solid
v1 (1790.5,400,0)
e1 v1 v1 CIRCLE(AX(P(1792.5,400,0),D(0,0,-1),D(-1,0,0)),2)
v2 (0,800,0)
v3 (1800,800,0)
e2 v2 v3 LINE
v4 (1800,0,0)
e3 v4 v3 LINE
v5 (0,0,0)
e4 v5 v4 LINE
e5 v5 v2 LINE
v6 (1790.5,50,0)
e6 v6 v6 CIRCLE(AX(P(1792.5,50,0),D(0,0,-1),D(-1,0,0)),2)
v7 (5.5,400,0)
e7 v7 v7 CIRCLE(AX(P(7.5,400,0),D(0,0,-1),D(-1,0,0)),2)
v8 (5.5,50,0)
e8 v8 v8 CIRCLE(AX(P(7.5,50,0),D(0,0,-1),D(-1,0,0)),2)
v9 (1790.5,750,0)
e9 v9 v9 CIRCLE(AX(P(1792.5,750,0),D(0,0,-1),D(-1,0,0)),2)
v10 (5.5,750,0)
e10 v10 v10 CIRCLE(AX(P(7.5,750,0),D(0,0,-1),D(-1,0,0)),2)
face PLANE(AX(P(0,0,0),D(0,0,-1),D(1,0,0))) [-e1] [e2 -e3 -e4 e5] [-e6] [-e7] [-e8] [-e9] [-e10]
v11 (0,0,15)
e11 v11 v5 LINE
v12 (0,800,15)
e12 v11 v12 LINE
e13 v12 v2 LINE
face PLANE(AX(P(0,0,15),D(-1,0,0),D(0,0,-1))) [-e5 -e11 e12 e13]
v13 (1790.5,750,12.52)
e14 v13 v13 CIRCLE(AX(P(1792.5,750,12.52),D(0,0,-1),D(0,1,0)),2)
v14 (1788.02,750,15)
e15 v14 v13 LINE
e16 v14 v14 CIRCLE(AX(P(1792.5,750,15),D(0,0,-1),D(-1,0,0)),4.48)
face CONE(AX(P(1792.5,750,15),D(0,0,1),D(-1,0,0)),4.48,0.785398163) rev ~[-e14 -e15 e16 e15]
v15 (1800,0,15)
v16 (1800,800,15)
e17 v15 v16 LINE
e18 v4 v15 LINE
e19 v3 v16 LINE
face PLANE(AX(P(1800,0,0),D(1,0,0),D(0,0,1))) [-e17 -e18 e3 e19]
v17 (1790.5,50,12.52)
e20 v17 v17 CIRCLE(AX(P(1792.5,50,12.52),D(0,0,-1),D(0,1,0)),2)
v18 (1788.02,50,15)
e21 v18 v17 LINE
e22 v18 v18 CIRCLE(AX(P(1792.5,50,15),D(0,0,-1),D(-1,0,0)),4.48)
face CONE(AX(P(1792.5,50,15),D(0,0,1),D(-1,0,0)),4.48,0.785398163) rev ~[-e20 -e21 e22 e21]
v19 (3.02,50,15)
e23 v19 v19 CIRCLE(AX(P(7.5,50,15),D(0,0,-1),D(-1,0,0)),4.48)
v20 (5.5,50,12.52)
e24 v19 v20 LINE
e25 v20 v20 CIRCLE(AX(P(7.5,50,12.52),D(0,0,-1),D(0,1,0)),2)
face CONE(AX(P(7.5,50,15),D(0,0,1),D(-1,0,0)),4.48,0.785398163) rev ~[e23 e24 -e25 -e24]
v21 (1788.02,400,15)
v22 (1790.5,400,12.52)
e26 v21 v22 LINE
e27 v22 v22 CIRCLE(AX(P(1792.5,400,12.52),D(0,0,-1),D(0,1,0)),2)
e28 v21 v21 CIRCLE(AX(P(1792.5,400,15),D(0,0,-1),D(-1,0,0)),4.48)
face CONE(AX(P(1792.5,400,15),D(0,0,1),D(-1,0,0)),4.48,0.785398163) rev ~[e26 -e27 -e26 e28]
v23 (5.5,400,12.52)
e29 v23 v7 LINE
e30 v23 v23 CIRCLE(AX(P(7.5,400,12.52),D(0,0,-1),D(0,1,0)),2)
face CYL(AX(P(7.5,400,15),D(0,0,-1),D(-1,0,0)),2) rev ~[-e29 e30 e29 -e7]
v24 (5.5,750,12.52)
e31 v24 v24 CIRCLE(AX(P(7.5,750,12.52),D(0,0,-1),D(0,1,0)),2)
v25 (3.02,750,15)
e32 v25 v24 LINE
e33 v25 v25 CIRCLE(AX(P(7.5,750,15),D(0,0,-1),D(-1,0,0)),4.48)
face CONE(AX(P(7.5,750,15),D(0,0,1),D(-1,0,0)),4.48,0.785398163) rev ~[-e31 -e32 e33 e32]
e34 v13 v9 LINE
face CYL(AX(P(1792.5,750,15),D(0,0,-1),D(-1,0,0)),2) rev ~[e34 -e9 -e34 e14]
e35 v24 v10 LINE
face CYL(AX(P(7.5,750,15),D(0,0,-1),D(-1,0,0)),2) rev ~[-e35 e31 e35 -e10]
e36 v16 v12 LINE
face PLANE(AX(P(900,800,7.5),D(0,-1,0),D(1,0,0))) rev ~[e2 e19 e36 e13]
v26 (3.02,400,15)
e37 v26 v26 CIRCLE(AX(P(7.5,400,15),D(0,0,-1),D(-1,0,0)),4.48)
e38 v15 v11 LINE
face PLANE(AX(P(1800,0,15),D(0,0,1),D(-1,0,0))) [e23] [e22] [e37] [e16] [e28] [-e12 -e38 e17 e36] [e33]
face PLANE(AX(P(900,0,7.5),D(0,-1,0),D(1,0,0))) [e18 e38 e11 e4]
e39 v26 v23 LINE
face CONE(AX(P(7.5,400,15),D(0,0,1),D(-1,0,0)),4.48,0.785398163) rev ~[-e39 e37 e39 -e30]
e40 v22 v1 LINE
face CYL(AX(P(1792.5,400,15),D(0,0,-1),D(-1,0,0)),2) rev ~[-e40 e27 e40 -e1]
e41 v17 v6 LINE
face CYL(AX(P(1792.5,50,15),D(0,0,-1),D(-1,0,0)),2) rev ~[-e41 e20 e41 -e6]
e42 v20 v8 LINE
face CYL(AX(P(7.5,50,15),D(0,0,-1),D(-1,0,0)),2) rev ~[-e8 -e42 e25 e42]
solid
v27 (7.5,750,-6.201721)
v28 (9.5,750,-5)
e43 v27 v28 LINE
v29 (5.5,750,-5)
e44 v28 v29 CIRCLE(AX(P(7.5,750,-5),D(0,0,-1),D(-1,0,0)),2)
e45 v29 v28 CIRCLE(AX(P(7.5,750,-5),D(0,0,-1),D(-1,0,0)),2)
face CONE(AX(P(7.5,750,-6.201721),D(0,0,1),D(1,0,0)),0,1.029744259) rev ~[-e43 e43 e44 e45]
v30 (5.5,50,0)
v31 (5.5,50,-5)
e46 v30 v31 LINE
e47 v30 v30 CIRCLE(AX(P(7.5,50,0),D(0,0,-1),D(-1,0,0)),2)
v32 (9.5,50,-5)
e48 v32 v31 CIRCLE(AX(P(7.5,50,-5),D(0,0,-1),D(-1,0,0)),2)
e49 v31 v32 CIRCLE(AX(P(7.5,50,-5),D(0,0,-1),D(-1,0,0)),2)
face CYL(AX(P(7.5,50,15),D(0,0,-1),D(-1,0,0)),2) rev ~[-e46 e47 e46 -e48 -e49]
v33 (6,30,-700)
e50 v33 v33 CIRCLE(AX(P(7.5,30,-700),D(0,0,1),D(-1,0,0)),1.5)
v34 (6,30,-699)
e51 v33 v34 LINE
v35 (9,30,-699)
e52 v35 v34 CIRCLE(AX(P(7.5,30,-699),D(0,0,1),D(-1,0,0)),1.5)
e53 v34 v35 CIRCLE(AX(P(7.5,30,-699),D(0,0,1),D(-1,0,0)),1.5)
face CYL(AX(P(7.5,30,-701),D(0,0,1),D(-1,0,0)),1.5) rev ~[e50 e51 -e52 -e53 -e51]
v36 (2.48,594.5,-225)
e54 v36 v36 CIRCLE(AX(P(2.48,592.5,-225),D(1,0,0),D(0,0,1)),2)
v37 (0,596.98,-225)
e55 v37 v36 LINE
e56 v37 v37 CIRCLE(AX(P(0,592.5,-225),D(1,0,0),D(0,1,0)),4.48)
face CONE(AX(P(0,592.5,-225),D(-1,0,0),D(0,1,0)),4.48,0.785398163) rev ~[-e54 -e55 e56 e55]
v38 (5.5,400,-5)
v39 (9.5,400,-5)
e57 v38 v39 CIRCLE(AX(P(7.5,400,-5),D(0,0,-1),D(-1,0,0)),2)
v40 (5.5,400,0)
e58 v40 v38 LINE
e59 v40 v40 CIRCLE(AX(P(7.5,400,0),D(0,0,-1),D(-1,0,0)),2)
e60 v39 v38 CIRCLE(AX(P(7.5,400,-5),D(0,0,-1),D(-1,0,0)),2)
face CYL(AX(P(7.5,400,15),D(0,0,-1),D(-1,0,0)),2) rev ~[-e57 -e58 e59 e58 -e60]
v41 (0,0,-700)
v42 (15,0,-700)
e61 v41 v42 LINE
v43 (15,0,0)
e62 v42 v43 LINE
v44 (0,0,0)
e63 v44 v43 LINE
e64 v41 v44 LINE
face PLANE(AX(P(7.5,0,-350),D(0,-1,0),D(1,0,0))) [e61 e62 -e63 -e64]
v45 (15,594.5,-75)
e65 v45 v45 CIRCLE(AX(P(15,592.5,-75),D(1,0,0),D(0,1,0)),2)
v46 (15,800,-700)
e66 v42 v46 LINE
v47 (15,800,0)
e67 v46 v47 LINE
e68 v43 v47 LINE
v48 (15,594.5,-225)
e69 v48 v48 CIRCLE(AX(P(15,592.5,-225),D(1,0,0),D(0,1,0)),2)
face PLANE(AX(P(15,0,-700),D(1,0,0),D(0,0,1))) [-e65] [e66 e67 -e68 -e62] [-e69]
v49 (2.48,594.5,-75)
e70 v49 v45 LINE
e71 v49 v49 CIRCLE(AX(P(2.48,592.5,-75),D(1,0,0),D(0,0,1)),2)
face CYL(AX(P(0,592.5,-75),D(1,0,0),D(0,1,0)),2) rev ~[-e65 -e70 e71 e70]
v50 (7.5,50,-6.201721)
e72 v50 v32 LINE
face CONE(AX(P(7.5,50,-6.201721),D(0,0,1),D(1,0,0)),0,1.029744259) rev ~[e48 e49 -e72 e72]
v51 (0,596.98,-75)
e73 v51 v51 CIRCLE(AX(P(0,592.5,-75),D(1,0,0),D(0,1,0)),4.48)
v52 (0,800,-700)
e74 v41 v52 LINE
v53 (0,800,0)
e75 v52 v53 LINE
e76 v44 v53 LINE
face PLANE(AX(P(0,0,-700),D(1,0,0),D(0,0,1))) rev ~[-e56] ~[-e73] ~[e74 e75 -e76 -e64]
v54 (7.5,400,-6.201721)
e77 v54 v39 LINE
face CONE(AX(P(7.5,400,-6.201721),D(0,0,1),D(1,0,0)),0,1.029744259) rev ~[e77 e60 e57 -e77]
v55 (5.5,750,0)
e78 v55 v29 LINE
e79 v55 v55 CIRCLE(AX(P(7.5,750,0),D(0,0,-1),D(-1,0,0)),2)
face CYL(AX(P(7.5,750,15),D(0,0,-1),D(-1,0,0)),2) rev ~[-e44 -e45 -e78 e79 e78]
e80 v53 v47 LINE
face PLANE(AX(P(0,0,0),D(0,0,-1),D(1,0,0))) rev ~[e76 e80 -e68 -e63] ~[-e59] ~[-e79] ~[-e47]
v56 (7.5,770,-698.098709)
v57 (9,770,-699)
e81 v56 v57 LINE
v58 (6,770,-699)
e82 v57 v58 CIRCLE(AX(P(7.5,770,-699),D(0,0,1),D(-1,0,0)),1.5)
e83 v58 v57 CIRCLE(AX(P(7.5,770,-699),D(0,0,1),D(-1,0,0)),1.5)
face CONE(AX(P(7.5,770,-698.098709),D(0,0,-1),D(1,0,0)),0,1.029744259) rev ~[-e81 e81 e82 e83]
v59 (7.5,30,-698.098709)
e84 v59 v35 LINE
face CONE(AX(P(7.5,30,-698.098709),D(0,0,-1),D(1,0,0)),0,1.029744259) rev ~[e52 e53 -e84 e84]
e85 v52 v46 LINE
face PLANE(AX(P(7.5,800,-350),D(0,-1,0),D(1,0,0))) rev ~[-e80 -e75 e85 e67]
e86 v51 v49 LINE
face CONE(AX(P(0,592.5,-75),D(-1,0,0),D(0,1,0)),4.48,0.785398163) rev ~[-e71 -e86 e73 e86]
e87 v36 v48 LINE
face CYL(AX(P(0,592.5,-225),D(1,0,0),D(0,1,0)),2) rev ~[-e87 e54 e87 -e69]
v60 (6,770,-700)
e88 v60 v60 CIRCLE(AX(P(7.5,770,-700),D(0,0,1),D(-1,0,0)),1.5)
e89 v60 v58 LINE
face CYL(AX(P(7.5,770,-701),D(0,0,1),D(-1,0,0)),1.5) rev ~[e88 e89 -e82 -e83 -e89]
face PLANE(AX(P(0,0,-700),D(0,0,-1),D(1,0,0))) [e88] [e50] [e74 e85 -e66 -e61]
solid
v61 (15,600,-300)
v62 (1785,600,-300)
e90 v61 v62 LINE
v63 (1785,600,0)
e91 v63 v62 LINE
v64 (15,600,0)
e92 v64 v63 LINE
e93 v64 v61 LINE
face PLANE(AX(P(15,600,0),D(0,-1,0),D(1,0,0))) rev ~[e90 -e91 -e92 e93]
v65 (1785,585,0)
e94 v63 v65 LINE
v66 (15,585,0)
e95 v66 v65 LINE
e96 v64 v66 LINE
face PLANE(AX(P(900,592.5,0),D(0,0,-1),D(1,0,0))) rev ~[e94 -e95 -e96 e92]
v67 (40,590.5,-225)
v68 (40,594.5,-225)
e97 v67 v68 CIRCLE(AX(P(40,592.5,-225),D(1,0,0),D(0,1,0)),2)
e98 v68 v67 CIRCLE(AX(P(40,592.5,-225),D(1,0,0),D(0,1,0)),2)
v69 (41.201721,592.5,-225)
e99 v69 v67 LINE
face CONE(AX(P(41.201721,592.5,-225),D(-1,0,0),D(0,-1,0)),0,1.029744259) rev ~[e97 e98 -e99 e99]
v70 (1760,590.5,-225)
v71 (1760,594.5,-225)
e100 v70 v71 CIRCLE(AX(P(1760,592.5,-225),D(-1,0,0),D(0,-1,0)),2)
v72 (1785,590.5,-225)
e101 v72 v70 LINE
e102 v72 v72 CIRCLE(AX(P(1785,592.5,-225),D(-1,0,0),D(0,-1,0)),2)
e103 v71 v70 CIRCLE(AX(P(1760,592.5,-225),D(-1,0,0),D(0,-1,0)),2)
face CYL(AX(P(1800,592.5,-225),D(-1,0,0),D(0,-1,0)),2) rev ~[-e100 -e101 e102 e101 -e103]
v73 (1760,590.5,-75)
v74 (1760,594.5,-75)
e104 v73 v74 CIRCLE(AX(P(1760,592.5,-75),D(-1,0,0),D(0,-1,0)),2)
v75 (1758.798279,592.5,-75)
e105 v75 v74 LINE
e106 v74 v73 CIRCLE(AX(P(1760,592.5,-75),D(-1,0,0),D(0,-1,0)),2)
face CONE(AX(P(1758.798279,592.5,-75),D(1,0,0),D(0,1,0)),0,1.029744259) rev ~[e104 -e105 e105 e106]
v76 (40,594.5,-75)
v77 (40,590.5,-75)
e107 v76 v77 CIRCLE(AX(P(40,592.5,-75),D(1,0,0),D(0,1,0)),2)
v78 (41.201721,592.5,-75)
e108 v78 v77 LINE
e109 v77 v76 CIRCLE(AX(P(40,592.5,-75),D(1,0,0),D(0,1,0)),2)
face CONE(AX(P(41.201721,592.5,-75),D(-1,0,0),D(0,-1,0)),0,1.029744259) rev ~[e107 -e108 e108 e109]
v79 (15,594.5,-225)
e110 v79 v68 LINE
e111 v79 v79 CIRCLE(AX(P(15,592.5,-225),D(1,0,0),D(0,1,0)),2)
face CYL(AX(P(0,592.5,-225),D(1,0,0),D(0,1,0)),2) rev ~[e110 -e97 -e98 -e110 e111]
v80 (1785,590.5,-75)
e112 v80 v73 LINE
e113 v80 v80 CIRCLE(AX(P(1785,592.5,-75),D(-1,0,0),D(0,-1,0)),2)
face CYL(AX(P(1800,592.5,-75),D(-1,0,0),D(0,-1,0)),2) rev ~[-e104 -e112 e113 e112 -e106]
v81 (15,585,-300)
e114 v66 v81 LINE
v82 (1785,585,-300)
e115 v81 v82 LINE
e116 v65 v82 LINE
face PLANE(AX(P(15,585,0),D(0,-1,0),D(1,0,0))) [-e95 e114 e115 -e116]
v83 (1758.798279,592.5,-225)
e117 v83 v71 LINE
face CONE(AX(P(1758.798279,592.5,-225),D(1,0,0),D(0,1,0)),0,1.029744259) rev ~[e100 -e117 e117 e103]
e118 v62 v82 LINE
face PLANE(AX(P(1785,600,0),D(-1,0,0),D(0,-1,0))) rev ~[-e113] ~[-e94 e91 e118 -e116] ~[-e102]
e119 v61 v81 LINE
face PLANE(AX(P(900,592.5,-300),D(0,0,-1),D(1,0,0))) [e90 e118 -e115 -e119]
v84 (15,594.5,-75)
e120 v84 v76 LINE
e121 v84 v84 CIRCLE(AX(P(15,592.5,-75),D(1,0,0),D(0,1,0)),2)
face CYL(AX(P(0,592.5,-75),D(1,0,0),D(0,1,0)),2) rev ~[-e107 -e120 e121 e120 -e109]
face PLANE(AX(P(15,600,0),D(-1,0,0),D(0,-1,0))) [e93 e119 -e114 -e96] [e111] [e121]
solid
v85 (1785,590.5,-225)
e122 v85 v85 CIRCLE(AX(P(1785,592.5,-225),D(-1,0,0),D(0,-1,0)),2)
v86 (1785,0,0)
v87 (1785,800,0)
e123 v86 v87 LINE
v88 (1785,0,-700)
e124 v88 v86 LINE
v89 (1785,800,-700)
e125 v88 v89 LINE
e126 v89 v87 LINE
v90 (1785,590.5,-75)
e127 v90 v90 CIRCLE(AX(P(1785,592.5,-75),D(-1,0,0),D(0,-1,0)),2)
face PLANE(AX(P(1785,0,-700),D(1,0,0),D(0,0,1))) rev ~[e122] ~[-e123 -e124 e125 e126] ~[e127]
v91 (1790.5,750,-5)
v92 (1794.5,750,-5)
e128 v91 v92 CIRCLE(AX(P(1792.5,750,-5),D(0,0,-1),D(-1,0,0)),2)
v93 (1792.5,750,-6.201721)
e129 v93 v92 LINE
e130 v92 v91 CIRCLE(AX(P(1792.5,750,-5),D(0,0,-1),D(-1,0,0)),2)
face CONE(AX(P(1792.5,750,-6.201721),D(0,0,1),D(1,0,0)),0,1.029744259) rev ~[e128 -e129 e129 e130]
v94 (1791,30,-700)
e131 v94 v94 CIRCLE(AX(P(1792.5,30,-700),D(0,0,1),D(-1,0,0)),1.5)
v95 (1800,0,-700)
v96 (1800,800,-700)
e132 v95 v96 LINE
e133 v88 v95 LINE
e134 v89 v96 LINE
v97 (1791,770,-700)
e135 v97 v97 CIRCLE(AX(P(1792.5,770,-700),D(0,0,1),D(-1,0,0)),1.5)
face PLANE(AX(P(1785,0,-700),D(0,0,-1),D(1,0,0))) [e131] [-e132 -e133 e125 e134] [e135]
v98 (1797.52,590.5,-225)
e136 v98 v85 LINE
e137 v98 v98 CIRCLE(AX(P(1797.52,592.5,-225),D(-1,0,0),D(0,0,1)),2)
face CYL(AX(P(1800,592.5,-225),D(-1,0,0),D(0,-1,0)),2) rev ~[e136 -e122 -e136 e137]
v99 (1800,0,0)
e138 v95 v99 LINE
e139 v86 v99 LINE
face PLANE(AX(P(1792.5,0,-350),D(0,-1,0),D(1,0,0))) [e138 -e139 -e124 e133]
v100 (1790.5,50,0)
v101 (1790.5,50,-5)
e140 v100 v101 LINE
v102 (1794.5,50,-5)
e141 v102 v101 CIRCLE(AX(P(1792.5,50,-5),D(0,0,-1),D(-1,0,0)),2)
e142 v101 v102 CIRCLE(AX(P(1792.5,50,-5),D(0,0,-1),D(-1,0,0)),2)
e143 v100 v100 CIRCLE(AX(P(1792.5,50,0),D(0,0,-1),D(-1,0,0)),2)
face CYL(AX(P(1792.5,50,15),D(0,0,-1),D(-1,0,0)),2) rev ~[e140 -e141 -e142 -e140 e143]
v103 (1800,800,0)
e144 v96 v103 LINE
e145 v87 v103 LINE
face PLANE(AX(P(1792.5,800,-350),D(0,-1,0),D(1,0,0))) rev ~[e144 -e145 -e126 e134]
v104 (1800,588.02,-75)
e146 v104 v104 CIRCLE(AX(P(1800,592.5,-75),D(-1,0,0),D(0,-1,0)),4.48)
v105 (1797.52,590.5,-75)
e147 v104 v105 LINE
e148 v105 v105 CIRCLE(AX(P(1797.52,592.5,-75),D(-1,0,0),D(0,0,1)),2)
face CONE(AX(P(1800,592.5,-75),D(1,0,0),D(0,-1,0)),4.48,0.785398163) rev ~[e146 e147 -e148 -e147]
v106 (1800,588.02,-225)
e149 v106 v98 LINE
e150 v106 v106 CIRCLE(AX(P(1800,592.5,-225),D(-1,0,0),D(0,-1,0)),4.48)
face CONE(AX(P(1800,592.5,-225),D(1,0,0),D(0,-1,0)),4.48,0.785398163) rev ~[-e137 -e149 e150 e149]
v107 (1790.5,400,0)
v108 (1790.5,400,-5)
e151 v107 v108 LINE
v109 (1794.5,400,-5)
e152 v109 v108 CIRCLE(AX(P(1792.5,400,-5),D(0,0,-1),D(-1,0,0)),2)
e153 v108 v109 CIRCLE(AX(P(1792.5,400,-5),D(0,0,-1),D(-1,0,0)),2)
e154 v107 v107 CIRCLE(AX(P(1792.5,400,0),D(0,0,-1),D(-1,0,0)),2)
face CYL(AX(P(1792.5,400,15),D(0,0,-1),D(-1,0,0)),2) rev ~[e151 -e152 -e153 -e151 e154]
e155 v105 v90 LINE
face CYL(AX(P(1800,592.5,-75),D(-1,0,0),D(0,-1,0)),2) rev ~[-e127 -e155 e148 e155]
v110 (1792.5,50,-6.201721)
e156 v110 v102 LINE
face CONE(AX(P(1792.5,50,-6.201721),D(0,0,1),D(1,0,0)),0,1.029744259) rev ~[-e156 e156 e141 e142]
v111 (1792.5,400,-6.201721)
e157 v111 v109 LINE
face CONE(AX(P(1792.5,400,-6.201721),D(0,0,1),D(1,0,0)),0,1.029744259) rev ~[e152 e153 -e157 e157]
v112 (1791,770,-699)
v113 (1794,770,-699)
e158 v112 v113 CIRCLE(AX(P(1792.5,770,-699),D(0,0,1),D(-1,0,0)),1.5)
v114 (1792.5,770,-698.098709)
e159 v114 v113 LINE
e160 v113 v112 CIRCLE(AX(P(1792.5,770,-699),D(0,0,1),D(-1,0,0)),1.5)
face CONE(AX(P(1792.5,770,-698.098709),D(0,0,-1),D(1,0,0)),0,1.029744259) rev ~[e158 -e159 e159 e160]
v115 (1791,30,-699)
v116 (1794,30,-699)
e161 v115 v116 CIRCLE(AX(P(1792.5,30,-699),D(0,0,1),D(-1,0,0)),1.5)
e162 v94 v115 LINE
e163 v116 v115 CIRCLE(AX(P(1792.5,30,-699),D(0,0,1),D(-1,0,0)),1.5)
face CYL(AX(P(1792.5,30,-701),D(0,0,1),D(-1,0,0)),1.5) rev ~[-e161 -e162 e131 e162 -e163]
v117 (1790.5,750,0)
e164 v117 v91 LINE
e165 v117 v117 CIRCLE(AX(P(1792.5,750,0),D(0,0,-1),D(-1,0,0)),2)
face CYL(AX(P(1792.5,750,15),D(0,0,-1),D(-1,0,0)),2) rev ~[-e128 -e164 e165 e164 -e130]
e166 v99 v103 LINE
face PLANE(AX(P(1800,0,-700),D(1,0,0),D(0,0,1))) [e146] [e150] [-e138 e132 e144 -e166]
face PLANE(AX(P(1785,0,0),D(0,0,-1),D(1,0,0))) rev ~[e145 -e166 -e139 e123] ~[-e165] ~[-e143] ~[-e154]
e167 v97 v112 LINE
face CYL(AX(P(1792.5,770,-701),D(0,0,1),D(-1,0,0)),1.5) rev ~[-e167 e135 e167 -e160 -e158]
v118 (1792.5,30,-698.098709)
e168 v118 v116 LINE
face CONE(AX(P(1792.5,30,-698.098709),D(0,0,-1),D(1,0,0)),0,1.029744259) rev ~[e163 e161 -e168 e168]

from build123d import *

# Parameters (mm, degrees)
F1_DEPTH          = 800
F0_W              = 15
F0_H              = 700
F2_DEPTH          = 800
F3_W              = 1770
F3_H              = 15
F4_DEPTH          = 300
F6_D              = 4
F6_DEPTH          = 20
F6_CSINK_D        = 8.96
F6_CSINK_ANGLE    = 90
F6_TIP            = 1.2017212381
F6_2_D            = 4
F6_2_DEPTH        = 20
F6_2_CSINK_D      = 8.96
F6_2_CSINK_ANGLE  = 90
F6_2_TIP          = 1.2017212381
F6_3_D            = 4
F6_3_DEPTH        = 20
F6_3_CSINK_D      = 8.96
F6_3_CSINK_ANGLE  = 90
F6_3_TIP          = 1.2017212381
F8_D              = 4
F8_DEPTH          = 40
F8_CSINK_D        = 8.96
F8_CSINK_ANGLE    = 90
F8_TIP            = 1.2017212381
F8_2_D            = 4
F8_2_DEPTH        = 40
F8_2_CSINK_D      = 8.96
F8_2_CSINK_ANGLE  = 90
F8_2_TIP          = 1.2017212381
F10_D             = 4
F10_DEPTH         = 40
F10_CSINK_D       = 8.96
F10_CSINK_ANGLE   = 90
F10_TIP           = 1.2017212381
F10_2_D           = 4
F10_2_DEPTH       = 40
F10_2_CSINK_D     = 8.96
F10_2_CSINK_ANGLE = 90
F10_2_TIP         = 1.2017212381
F12_D             = 3
F12_DEPTH         = 1
F12_TIP           = 0.9012909285
F12_2_D           = 3
F12_2_DEPTH       = 1
F12_2_TIP         = 0.9012909285


# Not quite as in the source:
# - a feature names something its author has since deleted; it is built from what else it names


with BuildPart() as f1:
    # F0 (on Front) → F1 (new body)
    with BuildSketch(Plane.XZ):
        Polygon((0, 15), (0, 0), (15, 0), (1785, 0), (1800, 0), (1800, 15), align=None)
    extrude(amount=-F1_DEPTH)

    # F6
    with Locations(Plane.XY.offset(15)):
        with Locations((7.5, 750), (7.5, 400), (7.5, 50), (1792.5, 750), (1792.5, 400), (1792.5, 50)):
            CounterSinkHole(F6_D / 2, F6_CSINK_D / 2, depth=F6_DEPTH, counter_sink_angle=F6_CSINK_ANGLE)
            with Locations((0, 0, -(F6_DEPTH + F6_TIP / 2))):  # 118° drill point
                Cone(0, F6_D / 2, F6_TIP, mode=Mode.SUBTRACT)


with BuildPart() as f2:
    # F0 (on Front) → F2 (new body)
    with BuildSketch(Plane.XZ):
        with Locations((7.5, -350)):
            Rectangle(F0_W, F0_H)
    extrude(amount=-F2_DEPTH)

    # F6#2
    with Locations(Plane.XY.offset(15)):
        with Locations((7.5, 750), (7.5, 400), (7.5, 50), (1792.5, 750), (1792.5, 400), (1792.5, 50)):
            CounterSinkHole(F6_2_D / 2, F6_2_CSINK_D / 2, depth=F6_2_DEPTH, counter_sink_angle=F6_2_CSINK_ANGLE)
            with Locations((0, 0, -(F6_2_DEPTH + F6_2_TIP / 2))):  # 118° drill point
                Cone(0, F6_2_D / 2, F6_2_TIP, mode=Mode.SUBTRACT)

    # F8
    with Locations(Plane(origin=(0, 0, 0), x_dir=(0, -1, 0), z_dir=(-1, 0, 0))):
        with Locations((-592.5, -75), (-592.5, -225)):
            CounterSinkHole(F8_D / 2, F8_CSINK_D / 2, depth=F8_DEPTH, counter_sink_angle=F8_CSINK_ANGLE)
            with Locations((0, 0, -(F8_DEPTH + F8_TIP / 2))):  # 118° drill point
                Cone(0, F8_D / 2, F8_TIP, mode=Mode.SUBTRACT)

    # F12
    with Locations(Plane(origin=(0, 0, -700), x_dir=(1, 0, 0), z_dir=(0, 0, -1))):
        with Locations((1792.5, -30), (1792.5, -770), (7.5, -30), (7.5, -770)):
            Hole(F12_D / 2, depth=F12_DEPTH)
            with Locations((0, 0, -(F12_DEPTH + F12_TIP / 2))):  # 118° drill point
                Cone(0, F12_D / 2, F12_TIP, mode=Mode.SUBTRACT)


with BuildPart() as f2b:
    # F0 (on Front) → F2, piece 2 (new body)
    with BuildSketch(Plane.XZ):
        with Locations((1792.5, -350)):
            Rectangle(F0_W, F0_H)
    extrude(amount=-F2_DEPTH)

    # F6#3
    with Locations(Plane.XY.offset(15)):
        with Locations((7.5, 750), (7.5, 400), (7.5, 50), (1792.5, 750), (1792.5, 400), (1792.5, 50)):
            CounterSinkHole(F6_3_D / 2, F6_3_CSINK_D / 2, depth=F6_3_DEPTH, counter_sink_angle=F6_3_CSINK_ANGLE)
            with Locations((0, 0, -(F6_3_DEPTH + F6_3_TIP / 2))):  # 118° drill point
                Cone(0, F6_3_D / 2, F6_3_TIP, mode=Mode.SUBTRACT)

    # F10
    with Locations(Plane.YZ.offset(1800)):
        with Locations((592.5, -75), (592.5, -225)):
            CounterSinkHole(F10_D / 2, F10_CSINK_D / 2, depth=F10_DEPTH, counter_sink_angle=F10_CSINK_ANGLE)
            with Locations((0, 0, -(F10_DEPTH + F10_TIP / 2))):  # 118° drill point
                Cone(0, F10_D / 2, F10_TIP, mode=Mode.SUBTRACT)

    # F12#2
    with Locations(Plane(origin=(0, 0, -700), x_dir=(1, 0, 0), z_dir=(0, 0, -1))):
        with Locations((1792.5, -30), (1792.5, -770), (7.5, -30), (7.5, -770)):
            Hole(F12_2_D / 2, depth=F12_2_DEPTH)
            with Locations((0, 0, -(F12_2_DEPTH + F12_2_TIP / 2))):  # 118° drill point
                Cone(0, F12_2_D / 2, F12_2_TIP, mode=Mode.SUBTRACT)


with BuildPart() as f4:
    # F3 (on face) → F4 (new body)
    with BuildSketch(Plane(origin=(0, 0, 0), x_dir=(1, 0, 0), z_dir=(0, 0, -1))):
        with Locations((900, -592.5)):
            Rectangle(F3_W, F3_H)
    extrude(amount=F4_DEPTH)

    # F8#2
    with Locations(Plane(origin=(0, 0, 0), x_dir=(0, -1, 0), z_dir=(-1, 0, 0))):
        with Locations((-592.5, -75), (-592.5, -225)):
            CounterSinkHole(F8_2_D / 2, F8_2_CSINK_D / 2, depth=F8_2_DEPTH, counter_sink_angle=F8_2_CSINK_ANGLE)
            with Locations((0, 0, -(F8_2_DEPTH + F8_2_TIP / 2))):  # 118° drill point
                Cone(0, F8_2_D / 2, F8_2_TIP, mode=Mode.SUBTRACT)

    # F10#2
    with Locations(Plane.YZ.offset(1800)):
        with Locations((592.5, -75), (592.5, -225)):
            CounterSinkHole(F10_2_D / 2, F10_2_CSINK_D / 2, depth=F10_2_DEPTH, counter_sink_angle=F10_2_CSINK_ANGLE)
            with Locations((0, 0, -(F10_2_DEPTH + F10_2_TIP / 2))):  # 118° drill point
                Cone(0, F10_2_D / 2, F10_2_TIP, mode=Mode.SUBTRACT)


solid = Compound([f1.part, f2.part, f2b.part, f4.part])
